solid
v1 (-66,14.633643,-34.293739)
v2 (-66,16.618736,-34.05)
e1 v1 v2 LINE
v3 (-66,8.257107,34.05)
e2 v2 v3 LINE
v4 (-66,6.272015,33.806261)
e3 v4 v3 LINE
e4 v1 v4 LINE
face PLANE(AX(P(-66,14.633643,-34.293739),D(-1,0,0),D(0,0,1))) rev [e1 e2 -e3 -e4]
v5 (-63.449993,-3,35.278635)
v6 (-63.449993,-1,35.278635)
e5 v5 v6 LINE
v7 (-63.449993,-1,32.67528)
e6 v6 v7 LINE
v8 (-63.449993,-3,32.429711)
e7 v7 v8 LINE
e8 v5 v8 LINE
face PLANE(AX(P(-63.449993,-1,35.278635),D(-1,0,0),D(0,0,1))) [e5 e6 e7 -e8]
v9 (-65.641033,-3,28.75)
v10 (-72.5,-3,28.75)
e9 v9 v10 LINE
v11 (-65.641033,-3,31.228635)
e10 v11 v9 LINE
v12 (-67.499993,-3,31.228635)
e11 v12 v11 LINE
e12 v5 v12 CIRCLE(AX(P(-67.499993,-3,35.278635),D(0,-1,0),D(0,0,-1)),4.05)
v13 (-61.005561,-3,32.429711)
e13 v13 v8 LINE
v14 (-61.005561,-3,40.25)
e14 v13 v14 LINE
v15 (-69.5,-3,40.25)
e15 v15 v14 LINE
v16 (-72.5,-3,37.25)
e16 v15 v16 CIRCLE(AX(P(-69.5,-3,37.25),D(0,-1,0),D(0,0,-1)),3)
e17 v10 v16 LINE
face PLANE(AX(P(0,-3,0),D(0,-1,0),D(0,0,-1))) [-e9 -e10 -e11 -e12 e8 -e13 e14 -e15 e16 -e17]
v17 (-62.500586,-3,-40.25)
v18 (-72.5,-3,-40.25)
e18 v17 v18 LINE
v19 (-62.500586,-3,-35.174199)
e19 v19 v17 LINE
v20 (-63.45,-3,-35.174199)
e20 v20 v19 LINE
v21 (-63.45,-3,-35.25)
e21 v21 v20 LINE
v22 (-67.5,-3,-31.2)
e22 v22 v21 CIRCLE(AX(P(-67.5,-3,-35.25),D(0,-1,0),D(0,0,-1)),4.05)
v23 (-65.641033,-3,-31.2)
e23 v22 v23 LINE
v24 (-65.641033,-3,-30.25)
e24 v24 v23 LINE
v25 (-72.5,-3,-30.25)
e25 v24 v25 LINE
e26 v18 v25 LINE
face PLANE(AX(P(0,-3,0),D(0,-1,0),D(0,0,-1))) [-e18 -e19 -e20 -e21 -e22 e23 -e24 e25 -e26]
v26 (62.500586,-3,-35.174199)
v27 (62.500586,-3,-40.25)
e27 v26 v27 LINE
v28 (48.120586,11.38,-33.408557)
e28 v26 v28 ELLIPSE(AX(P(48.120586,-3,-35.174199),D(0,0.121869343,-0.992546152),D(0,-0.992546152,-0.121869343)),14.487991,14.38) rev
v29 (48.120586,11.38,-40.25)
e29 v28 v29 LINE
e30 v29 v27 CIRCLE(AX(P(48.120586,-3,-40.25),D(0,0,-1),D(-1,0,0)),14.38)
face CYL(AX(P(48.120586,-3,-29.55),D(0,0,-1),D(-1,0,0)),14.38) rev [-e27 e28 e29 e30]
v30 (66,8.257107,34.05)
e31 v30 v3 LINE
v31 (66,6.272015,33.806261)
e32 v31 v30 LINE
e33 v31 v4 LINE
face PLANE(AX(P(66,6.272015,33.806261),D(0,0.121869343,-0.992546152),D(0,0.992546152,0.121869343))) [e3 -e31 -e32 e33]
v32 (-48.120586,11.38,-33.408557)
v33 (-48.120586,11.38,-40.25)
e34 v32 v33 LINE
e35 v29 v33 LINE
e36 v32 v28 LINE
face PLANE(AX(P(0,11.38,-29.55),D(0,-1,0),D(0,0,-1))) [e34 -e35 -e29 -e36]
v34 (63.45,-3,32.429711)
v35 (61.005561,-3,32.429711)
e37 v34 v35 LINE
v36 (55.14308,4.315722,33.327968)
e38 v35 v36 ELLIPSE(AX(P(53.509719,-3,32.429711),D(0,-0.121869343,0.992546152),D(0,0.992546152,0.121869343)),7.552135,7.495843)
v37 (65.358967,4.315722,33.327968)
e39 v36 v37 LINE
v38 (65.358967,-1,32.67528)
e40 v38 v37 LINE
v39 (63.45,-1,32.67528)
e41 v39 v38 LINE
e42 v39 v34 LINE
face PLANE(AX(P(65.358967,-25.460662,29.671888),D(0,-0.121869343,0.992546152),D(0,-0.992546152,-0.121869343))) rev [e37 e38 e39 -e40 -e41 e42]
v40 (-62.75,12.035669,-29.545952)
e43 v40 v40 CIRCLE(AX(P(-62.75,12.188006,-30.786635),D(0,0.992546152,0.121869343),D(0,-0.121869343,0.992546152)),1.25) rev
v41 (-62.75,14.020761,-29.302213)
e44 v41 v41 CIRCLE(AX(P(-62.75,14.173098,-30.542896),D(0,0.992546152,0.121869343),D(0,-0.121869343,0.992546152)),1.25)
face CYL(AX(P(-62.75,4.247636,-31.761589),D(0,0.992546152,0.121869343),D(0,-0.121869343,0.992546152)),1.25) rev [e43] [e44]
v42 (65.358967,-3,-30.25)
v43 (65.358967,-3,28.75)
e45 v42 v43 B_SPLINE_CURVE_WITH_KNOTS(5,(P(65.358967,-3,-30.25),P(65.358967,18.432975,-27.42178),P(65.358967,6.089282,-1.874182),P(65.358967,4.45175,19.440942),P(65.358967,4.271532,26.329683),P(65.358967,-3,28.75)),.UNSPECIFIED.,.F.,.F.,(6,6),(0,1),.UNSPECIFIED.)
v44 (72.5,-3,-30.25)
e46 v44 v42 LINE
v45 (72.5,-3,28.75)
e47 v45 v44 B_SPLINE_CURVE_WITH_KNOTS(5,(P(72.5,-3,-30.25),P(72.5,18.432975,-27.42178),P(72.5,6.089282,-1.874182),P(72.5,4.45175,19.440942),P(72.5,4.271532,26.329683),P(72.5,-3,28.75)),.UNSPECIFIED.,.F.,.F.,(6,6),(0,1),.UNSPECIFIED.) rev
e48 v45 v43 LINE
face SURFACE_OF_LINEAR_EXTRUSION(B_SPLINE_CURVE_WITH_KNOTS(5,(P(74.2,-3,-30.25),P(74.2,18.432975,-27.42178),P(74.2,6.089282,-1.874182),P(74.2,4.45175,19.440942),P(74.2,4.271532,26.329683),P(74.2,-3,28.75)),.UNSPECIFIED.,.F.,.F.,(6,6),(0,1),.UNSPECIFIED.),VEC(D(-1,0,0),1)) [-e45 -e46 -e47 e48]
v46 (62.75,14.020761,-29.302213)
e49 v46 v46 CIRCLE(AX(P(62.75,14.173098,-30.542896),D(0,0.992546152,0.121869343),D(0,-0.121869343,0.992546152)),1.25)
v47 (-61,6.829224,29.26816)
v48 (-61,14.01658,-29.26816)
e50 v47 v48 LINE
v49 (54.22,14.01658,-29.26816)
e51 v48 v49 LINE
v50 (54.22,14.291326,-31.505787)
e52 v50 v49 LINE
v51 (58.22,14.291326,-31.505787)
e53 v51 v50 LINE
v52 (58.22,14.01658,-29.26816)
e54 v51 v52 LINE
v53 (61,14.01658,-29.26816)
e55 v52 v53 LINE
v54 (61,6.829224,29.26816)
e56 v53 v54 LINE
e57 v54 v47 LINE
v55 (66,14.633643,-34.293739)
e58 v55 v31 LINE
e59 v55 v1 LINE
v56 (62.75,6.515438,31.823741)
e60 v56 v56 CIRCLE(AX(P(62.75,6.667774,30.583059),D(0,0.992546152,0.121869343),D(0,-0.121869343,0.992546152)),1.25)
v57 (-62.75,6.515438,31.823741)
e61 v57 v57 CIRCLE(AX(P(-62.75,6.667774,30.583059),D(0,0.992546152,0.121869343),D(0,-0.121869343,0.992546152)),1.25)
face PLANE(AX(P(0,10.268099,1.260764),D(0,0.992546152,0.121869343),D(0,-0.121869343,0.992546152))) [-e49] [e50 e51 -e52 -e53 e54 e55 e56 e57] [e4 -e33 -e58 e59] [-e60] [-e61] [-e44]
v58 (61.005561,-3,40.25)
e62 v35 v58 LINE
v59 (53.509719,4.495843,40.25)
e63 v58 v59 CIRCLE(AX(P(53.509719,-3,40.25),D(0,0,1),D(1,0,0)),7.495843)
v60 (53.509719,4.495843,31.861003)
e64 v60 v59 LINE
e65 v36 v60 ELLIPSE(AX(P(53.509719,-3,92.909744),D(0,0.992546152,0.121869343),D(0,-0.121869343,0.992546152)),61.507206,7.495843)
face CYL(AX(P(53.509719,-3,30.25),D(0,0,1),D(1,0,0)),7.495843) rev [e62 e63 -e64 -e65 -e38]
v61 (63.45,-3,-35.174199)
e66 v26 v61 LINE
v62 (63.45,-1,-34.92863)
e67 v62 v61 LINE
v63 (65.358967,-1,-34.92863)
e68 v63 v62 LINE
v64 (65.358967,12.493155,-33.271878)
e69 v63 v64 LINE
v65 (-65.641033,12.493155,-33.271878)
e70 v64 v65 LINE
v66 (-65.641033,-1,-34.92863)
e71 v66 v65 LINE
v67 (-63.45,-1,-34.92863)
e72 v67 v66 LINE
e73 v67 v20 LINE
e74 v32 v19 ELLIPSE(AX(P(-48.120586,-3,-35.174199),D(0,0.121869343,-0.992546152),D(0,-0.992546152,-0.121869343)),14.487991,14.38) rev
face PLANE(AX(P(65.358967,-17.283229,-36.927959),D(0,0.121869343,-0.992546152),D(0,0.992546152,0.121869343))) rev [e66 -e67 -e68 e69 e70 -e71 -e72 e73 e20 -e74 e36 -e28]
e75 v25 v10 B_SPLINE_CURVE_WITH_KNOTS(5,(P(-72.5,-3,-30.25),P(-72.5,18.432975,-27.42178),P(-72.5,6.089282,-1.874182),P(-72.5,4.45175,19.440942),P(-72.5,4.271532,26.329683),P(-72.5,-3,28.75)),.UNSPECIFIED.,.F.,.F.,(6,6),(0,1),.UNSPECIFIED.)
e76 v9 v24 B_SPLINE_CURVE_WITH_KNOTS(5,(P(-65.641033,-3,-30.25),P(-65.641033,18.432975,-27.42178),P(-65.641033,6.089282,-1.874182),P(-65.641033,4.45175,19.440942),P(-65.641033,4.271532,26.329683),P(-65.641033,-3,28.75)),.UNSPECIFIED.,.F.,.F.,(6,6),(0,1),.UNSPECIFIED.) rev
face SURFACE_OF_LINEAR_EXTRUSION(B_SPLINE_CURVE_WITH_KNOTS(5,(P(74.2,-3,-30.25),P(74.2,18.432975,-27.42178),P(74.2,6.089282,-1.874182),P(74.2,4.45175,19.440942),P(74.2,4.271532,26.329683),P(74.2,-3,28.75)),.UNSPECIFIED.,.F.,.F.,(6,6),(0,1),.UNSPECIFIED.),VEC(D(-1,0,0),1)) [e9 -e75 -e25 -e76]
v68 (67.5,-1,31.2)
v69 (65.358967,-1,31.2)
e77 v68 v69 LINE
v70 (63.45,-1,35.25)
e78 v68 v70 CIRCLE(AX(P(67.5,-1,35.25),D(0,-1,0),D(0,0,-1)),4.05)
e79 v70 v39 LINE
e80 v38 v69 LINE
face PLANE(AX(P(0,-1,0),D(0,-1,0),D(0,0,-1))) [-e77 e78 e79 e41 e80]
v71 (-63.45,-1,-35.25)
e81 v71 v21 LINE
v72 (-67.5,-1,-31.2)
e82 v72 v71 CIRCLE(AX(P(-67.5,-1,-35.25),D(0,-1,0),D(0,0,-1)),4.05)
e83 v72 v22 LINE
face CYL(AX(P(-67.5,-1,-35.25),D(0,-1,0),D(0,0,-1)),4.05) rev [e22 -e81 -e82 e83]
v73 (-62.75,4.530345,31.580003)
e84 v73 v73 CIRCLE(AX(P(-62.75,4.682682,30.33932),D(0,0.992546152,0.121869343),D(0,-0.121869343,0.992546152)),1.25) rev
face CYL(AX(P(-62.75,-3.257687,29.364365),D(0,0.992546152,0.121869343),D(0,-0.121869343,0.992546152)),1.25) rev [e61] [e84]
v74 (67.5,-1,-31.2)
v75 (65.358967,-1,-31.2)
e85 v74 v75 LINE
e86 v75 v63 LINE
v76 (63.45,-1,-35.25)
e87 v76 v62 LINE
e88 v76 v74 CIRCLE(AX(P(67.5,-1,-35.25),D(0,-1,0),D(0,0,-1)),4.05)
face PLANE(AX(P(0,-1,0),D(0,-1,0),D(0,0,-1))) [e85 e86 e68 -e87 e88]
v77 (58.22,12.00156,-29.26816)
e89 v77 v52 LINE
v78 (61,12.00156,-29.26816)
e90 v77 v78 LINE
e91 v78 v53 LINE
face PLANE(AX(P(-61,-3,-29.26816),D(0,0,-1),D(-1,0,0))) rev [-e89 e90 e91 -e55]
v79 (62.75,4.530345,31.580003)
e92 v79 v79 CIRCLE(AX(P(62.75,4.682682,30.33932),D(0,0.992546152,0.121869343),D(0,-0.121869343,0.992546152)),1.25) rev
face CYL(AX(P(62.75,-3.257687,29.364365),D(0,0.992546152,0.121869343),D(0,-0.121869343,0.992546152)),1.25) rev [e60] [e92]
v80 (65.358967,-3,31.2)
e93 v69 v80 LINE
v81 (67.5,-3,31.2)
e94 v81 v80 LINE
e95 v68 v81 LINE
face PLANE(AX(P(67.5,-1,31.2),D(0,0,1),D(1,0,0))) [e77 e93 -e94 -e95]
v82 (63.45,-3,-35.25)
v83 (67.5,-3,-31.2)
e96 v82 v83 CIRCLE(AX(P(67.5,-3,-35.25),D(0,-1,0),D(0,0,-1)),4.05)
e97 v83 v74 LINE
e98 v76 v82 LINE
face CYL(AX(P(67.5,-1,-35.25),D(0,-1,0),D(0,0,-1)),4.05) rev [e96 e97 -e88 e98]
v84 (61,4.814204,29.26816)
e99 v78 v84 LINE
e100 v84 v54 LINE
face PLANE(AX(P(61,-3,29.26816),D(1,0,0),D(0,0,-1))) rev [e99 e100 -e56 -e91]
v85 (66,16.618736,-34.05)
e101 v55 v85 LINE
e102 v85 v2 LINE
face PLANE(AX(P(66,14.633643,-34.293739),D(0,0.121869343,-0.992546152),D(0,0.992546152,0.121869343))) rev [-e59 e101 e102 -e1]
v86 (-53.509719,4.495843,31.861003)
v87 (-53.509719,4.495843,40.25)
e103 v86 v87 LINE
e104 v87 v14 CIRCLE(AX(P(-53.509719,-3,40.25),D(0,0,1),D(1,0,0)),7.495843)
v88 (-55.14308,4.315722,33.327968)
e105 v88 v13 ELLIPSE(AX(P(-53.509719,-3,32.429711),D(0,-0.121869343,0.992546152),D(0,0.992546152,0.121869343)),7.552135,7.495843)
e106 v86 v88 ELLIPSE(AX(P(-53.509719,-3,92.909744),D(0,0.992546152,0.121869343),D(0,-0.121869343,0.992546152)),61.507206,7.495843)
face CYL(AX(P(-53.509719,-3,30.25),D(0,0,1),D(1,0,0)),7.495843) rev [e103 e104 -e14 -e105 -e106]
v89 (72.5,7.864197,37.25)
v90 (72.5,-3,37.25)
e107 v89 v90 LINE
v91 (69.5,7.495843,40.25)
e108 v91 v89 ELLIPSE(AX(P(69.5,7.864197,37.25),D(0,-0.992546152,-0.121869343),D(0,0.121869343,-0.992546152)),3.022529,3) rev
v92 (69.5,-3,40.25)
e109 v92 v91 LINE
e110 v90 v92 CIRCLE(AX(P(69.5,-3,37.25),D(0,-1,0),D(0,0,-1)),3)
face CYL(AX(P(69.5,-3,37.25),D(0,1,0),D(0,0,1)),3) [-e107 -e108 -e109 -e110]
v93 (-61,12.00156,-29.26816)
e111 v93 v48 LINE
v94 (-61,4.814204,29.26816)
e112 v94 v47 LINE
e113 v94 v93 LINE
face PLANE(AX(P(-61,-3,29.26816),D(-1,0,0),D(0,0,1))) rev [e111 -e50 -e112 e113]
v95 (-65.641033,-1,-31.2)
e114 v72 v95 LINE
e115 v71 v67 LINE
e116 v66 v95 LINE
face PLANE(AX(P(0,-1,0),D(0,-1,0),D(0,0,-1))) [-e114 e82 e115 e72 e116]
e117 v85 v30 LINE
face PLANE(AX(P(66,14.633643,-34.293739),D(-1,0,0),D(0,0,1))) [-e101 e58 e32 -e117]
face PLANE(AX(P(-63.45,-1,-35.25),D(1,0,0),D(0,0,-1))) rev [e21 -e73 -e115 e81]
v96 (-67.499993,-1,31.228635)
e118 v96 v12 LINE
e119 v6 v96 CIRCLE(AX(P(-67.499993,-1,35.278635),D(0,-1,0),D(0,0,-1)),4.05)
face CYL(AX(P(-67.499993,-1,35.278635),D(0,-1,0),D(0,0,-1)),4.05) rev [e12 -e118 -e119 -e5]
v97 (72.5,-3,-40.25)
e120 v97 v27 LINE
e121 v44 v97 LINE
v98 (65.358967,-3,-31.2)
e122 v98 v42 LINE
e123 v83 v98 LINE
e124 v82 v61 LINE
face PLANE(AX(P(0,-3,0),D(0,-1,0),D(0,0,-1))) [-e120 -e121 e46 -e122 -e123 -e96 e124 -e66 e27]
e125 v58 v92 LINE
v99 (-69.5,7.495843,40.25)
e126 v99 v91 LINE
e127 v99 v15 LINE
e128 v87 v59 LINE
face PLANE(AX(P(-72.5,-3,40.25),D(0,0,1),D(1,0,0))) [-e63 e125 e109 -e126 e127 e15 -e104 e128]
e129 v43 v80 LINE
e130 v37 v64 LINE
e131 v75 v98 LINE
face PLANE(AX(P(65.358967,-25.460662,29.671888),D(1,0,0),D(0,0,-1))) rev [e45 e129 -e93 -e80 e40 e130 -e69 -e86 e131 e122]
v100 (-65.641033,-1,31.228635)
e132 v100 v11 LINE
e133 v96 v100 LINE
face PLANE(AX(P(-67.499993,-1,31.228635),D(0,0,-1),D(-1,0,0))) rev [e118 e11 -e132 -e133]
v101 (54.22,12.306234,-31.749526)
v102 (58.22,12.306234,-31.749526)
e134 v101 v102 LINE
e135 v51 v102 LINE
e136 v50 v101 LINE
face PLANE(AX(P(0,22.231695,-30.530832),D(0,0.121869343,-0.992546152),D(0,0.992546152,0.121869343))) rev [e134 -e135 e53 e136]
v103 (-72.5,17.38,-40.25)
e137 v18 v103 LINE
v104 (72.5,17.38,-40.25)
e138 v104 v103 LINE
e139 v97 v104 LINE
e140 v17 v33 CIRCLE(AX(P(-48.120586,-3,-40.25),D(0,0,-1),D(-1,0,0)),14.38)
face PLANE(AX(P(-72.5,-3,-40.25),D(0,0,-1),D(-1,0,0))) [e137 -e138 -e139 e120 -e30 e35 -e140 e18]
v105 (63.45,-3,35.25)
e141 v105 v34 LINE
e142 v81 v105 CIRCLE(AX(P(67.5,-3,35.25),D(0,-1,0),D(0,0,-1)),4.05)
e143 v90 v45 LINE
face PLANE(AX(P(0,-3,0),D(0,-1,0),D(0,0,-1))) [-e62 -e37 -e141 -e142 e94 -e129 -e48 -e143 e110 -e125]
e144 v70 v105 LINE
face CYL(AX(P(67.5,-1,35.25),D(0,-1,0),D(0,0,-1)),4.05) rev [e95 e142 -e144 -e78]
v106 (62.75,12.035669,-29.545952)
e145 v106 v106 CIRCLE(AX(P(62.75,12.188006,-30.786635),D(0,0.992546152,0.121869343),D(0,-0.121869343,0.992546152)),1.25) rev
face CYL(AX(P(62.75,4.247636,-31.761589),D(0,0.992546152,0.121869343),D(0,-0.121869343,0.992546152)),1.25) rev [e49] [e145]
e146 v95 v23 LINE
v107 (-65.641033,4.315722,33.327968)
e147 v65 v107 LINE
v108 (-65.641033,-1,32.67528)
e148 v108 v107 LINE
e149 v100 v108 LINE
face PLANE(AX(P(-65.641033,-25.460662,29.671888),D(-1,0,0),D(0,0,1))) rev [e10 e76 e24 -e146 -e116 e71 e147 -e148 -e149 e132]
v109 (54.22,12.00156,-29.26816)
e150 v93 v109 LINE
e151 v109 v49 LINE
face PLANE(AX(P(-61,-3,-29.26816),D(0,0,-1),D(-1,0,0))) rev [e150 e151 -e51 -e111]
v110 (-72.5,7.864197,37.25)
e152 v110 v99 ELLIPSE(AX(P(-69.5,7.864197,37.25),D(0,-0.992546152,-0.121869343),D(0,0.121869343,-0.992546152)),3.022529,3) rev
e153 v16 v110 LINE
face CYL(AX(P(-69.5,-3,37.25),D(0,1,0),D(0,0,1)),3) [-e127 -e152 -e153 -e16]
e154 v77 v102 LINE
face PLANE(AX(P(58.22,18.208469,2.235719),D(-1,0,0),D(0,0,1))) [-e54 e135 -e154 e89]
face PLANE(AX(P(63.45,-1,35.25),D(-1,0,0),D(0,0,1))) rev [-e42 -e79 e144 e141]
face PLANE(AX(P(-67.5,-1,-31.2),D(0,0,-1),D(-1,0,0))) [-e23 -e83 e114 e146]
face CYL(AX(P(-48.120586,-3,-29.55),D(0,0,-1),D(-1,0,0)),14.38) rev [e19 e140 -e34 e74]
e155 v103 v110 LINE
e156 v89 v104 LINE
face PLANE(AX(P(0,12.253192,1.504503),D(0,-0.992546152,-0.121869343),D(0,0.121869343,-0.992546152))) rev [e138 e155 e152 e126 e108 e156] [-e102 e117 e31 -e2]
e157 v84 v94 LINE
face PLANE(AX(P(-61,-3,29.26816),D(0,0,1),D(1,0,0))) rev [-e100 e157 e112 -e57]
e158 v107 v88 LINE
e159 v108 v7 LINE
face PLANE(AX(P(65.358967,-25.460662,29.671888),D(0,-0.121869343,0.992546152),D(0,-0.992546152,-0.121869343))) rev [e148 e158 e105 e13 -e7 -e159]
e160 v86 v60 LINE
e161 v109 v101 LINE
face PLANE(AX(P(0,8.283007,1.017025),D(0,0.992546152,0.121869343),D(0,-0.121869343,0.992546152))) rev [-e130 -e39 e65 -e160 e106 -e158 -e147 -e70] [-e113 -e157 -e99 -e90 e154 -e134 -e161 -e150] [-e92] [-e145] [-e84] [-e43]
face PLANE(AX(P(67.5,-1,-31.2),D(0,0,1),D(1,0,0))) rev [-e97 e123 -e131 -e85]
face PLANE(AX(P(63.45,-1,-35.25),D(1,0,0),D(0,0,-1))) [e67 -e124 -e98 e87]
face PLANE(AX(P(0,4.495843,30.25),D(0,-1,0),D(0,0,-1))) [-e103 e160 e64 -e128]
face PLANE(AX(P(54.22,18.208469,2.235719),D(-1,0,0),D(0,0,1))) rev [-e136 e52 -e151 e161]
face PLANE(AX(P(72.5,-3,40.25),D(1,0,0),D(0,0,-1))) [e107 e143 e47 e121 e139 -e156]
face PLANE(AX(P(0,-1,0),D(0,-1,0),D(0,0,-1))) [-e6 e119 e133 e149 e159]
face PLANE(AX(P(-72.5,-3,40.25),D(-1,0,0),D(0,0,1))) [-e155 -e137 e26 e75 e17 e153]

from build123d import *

# Parameters (mm, degrees)
BOSS_EXTRUDE1_DEPTH       = 17.38
BOSS_EXTRUDE1_DEPTH_BACK  = 3
SKETCH1_W                 = 145
SKETCH1_H                 = 80.5
SKETCH1_W_2               = 132
SKETCH1_H_2               = 68.1
SKETCH2_W                 = 145.621836594
SKETCH2_H                 = 81.229894902
CUT_EXTRUDE1_DEPTH        = 10.38
FILLET1_R                 = 3
BOSS_EXTRUDE17_DEPTH      = 17.38
BOSS_EXTRUDE17_DEPTH_BACK = 3
SKETCH5_W                 = 132
SKETCH5_H                 = 68.1
SKETCH5_W_2               = 122
SKETCH5_H_2               = 58.53632086
SKETCH9_W                 = 144.471640976
SKETCH9_H                 = 84.136143584
CUT_EXTRUDE5_DEPTH        = 9.6
SKETCH6_W                 = 132
SKETCH6_H                 = 68.611419114
CUT_EXTRUDE6_DEPTH        = 2
CUT_EXTRUDE9_DEPTH        = 10.7
CUT_EXTRUDE12_START       = -145
CUT_EXTRUDE12_DEPTH       = 145
CUT_EXTRUDE13_DEPTH       = 10
SKETCH21_W                = 131
SKETCH21_H                = 67.1
CUT_EXTRUDE14_DEPTH       = 30
CUT_EXTRUDE15_START       = -2
CUT_EXTRUDE15_DEPTH       = 2
CUT_EXTRUDE17_DEPTH       = 10
CUT_EXTRUDE18_DEPTH       = 10


# Read off the part's stored shape, not the designer's step: Cut-Extrude12, Cut-Extrude15
with BuildPart() as part:
    # Sketch1 → Boss-Extrude1 (new, two sides: drawn at the far end of the back side and taken through both)
    with BuildSketch(Plane(origin=(0, 0, 0), x_dir=(1, 0, 0), z_dir=(0, 1, 0)).offset(-BOSS_EXTRUDE1_DEPTH_BACK)):
        Rectangle(SKETCH1_W, SKETCH1_H)
        Rectangle(SKETCH1_W_2, SKETCH1_H_2, mode=Mode.SUBTRACT)
    extrude(amount=BOSS_EXTRUDE1_DEPTH + BOSS_EXTRUDE1_DEPTH_BACK)

    # Sketch2 → Cut-Extrude1 (cut)
    with BuildSketch(Plane(origin=(0, 12.253191712, 1.504502764), x_dir=(-1, 0, 0), z_dir=(0, 0.9925461516413239, 0.12186934340513403))):
        with Locations((0.310918297, -1.453124341)):
            Rectangle(SKETCH2_W, SKETCH2_H)
    extrude(amount=CUT_EXTRUDE1_DEPTH, mode=Mode.SUBTRACT)

    # Fillet1
    fillet1_edges = [part.edges().sort_by_distance(p)[0] for p in [
        (72.5, 2.247921424, 40.25),
        (-72.5, 2.247921424, 40.25),
    ]]
    fillet(fillet1_edges, radius=FILLET1_R)

    # Sketch5 → Boss-Extrude17 (add, two sides: drawn at the far end of the back side and taken through both)
    with BuildSketch(Plane(origin=(0, 0, 0), x_dir=(1, 0, 0), z_dir=(0, 1, 0)).offset(-BOSS_EXTRUDE17_DEPTH_BACK)):
        Rectangle(SKETCH5_W, SKETCH5_H)
        Rectangle(SKETCH5_W_2, SKETCH5_H_2, mode=Mode.SUBTRACT)
    extrude(amount=BOSS_EXTRUDE17_DEPTH + BOSS_EXTRUDE17_DEPTH_BACK)

    # Sketch9 → Cut-Extrude5 (cut)
    with BuildSketch(Plane(origin=(0, 12.253191712, 1.504502764), x_dir=(1, 0, 0), z_dir=(0, 0.9925461516413238, 0.12186934340513406))):
        Rectangle(SKETCH9_W, SKETCH9_H)
    extrude(amount=CUT_EXTRUDE5_DEPTH, mode=Mode.SUBTRACT)

    # Sketch6 → Cut-Extrude6 (cut)
    with BuildSketch(Plane(origin=(0, 12.253191712, 1.504502764), x_dir=(-1, 0, 0), z_dir=(0, 0.9925461516413239, 0.12186934340513403))):
        with Locations((0, -1.515801317)):
            Rectangle(SKETCH6_W, SKETCH6_H)
    extrude(amount=-CUT_EXTRUDE6_DEPTH, mode=Mode.SUBTRACT)

    # Sketch12 → Cut-Extrude9 (cut)
    with BuildSketch(Plane(origin=(0, 0, -40.25), x_dir=(-1, 0, 0), z_dir=(0, 0, -1))):
        with BuildLine():
            Line((62.5, -3), (62.500586031, -3))
            ThreePointArc((62.500586031, -3), (58.288781544, 7.168195513), (48.120586031, 11.38))
            Line((48.120586031, 11.38), (0, 11.38))
            Line((0, 11.38), (-48.120586031, 11.38))
            ThreePointArc((-48.120586031, 11.38), (-58.288781544, 7.168195513), (-62.500586031, -3))
            Line((-62.500586031, -3), (62.5, -3))
        make_face()
    extrude(amount=-CUT_EXTRUDE9_DEPTH, mode=Mode.SUBTRACT)

    # Cut-Extrude12 outline → Cut-Extrude12 (cut)
    with BuildSketch(Plane.ZY.offset(72.5).offset(CUT_EXTRUDE12_START)):
        with BuildLine():
            Line((-30.25, -3), (28.75, -3))
            add(Edge.make_bspline(
                [(28.75, -3), (26.32968346, 4.271531969), (19.440941834, 4.451750453), (-1.874181617, 6.089281656), (-27.421780079, 18.432975247), (-30.25, -3)],
                knots=[0.042214979, 0.042214979, 0.042214979, 0.042214979, 0.042214979, 0.042214979, 1.042214979, 1.042214979, 1.042214979, 1.042214979, 1.042214979, 1.042214979], degree=5))
        make_face()
    extrude(amount=CUT_EXTRUDE12_DEPTH, mode=Mode.SUBTRACT)

    # Sketch19 → Cut-Extrude13 (cut)
    with BuildSketch(Plane(origin=(0, 10.268099409, 1.260764077), x_dir=(1, 0, 0), z_dir=(0, 0.9925461516413238, 0.12186934340513403))):
        with BuildLine():
            ThreePointArc((61.5, 32.0425), (61.866116524, 31.158616524), (62.75, 30.7925))
            Line((62.75, 30.7925), (62.75, 32.0425))
            Line((62.75, 32.0425), (61.5, 32.0425))
        make_face()
        with BuildLine():
            Line((62.75, 32.0425), (62.75, 30.7925))
            ThreePointArc((62.75, 30.7925), (63.633883476, 31.158616524), (64, 32.0425))
            ThreePointArc((64, 32.0425), (62.75, 33.2925), (61.5, 32.0425))
            Line((61.5, 32.0425), (62.75, 32.0425))
        make_face()
        with BuildLine():
            ThreePointArc((64, -29.5425), (63.633883476, -28.658616524), (62.75, -28.2925))
            Line((62.75, -28.2925), (62.75, -29.5425))
            Line((62.75, -29.5425), (61.5, -29.5425))
            ThreePointArc((61.5, -29.5425), (62.75, -30.7925), (64, -29.5425))
        make_face()
        with BuildLine():
            Line((62.75, -29.5425), (62.75, -28.2925))
            ThreePointArc((62.75, -28.2925), (61.866116524, -28.658616524), (61.5, -29.5425))
            Line((61.5, -29.5425), (62.75, -29.5425))
        make_face()
        with BuildLine():
            ThreePointArc((-61.5, -29.5425), (-61.866116524, -28.658616524), (-62.75, -28.2925))
            Line((-62.75, -28.2925), (-62.75, -29.5425))
            Line((-62.75, -29.5425), (-61.5, -29.5425))
        make_face()
        with BuildLine():
            Line((-62.75, -29.5425), (-62.75, -28.2925))
            ThreePointArc((-62.75, -28.2925), (-63.633883476, -30.426383476), (-61.5, -29.5425))
            Line((-61.5, -29.5425), (-62.75, -29.5425))
        make_face()
        with BuildLine():
            ThreePointArc((-61.5, 32.0425), (-63.633883476, 32.926383476), (-62.75, 30.7925))
            Line((-62.75, 30.7925), (-62.75, 32.0425))
            Line((-62.75, 32.0425), (-61.5, 32.0425))
        make_face()
        with BuildLine():
            Line((-62.75, 32.0425), (-62.75, 30.7925))
            ThreePointArc((-62.75, 30.7925), (-61.866116524, 31.158616524), (-61.5, 32.0425))
            Line((-61.5, 32.0425), (-62.75, 32.0425))
        make_face()
    extrude(amount=-CUT_EXTRUDE13_DEPTH, mode=Mode.SUBTRACT)

    # Sketch21 → Cut-Extrude14 (cut)
    with BuildSketch(Plane(origin=(0, 8.283007106, 1.01702539), x_dir=(1, 0, 0), z_dir=(0, 0.9925461516413238, 0.12186934340513403))):
        with Locations((-0.141032576, 0.996407471)):
            Rectangle(SKETCH21_W, SKETCH21_H)
    extrude(amount=-CUT_EXTRUDE14_DEPTH, mode=Mode.SUBTRACT)

    # Cut-Extrude15 outline → Cut-Extrude15 (cut)
    with BuildSketch(Plane(origin=(0, -3, 0), x_dir=(-1, 0, 0), z_dir=(0, -1, 0)).offset(CUT_EXTRUDE15_START)):
        with BuildLine():
            Line((67.499992595, -31.228634541), (63.449992595, -31.228634541))
            Line((63.449992595, -31.228634541), (63.449992595, -35.278634541))
            ThreePointArc((63.449992595, -35.278634541), (70.363775058, -38.142417005), (67.499992595, -31.228634541))
        make_face()
        with BuildLine():
            Line((63.449999996, 31.2), (67.499999996, 31.2))
            ThreePointArc((67.499999996, 31.2), (70.363782459, 38.113782464), (63.449999996, 35.25))
            Line((63.449999996, 35.25), (63.449999996, 31.2))
        make_face()
        with BuildLine():
            Line((-67.5, 31.2), (-63.45, 31.2))
            Line((-63.45, 31.2), (-63.45, 35.25))
            ThreePointArc((-63.45, 35.25), (-70.363782464, 38.113782464), (-67.5, 31.2))
        make_face()
        with BuildLine():
            Line((-63.45, -31.2), (-67.5, -31.2))
            ThreePointArc((-67.5, -31.2), (-70.363782464, -38.113782464), (-63.45, -35.25))
            Line((-63.45, -35.25), (-63.45, -31.2))
        make_face()
    extrude(amount=CUT_EXTRUDE15_DEPTH, mode=Mode.SUBTRACT)

    # Sketch25 → Cut-Extrude17 (cut)
    with BuildSketch(Plane(origin=(0, 8.283007106, 1.01702539), x_dir=(1, 0, 0), z_dir=(0, -0.9925461516413238, -0.1218693434051341))):
        Polygon((58.22, -33.01262228), (58.22, -32.0425), (58.22, -30.51262228), (54.22, -30.51262228), (54.22, -33.01262228), align=None)
    extrude(amount=-CUT_EXTRUDE17_DEPTH, mode=Mode.SUBTRACT)

    # Sketch26 → Cut-Extrude18 (cut)
    with BuildSketch(Plane.XY.offset(40.25)):
        with BuildLine():
            ThreePointArc((-53.509718644, 4.495842847), (-58.810079952, 2.300361308), (-61.005561492, -3))
            Line((-61.005561492, -3), (-61, -3))
            Line((-61, -3), (59.5, -3))
            Line((59.5, -3), (61.005561492, -3))
            ThreePointArc((61.005561492, -3), (58.810079952, 2.300361308), (53.509718644, 4.495842847))
            Line((53.509718644, 4.495842847), (53.241634956, 4.495842847))
            Line((53.241634956, 4.495842847), (0, 4.495842847))
            Line((0, 4.495842847), (-53.509718644, 4.495842847))
        make_face()
    extrude(amount=-CUT_EXTRUDE18_DEPTH, mode=Mode.SUBTRACT)


solid = part.part
